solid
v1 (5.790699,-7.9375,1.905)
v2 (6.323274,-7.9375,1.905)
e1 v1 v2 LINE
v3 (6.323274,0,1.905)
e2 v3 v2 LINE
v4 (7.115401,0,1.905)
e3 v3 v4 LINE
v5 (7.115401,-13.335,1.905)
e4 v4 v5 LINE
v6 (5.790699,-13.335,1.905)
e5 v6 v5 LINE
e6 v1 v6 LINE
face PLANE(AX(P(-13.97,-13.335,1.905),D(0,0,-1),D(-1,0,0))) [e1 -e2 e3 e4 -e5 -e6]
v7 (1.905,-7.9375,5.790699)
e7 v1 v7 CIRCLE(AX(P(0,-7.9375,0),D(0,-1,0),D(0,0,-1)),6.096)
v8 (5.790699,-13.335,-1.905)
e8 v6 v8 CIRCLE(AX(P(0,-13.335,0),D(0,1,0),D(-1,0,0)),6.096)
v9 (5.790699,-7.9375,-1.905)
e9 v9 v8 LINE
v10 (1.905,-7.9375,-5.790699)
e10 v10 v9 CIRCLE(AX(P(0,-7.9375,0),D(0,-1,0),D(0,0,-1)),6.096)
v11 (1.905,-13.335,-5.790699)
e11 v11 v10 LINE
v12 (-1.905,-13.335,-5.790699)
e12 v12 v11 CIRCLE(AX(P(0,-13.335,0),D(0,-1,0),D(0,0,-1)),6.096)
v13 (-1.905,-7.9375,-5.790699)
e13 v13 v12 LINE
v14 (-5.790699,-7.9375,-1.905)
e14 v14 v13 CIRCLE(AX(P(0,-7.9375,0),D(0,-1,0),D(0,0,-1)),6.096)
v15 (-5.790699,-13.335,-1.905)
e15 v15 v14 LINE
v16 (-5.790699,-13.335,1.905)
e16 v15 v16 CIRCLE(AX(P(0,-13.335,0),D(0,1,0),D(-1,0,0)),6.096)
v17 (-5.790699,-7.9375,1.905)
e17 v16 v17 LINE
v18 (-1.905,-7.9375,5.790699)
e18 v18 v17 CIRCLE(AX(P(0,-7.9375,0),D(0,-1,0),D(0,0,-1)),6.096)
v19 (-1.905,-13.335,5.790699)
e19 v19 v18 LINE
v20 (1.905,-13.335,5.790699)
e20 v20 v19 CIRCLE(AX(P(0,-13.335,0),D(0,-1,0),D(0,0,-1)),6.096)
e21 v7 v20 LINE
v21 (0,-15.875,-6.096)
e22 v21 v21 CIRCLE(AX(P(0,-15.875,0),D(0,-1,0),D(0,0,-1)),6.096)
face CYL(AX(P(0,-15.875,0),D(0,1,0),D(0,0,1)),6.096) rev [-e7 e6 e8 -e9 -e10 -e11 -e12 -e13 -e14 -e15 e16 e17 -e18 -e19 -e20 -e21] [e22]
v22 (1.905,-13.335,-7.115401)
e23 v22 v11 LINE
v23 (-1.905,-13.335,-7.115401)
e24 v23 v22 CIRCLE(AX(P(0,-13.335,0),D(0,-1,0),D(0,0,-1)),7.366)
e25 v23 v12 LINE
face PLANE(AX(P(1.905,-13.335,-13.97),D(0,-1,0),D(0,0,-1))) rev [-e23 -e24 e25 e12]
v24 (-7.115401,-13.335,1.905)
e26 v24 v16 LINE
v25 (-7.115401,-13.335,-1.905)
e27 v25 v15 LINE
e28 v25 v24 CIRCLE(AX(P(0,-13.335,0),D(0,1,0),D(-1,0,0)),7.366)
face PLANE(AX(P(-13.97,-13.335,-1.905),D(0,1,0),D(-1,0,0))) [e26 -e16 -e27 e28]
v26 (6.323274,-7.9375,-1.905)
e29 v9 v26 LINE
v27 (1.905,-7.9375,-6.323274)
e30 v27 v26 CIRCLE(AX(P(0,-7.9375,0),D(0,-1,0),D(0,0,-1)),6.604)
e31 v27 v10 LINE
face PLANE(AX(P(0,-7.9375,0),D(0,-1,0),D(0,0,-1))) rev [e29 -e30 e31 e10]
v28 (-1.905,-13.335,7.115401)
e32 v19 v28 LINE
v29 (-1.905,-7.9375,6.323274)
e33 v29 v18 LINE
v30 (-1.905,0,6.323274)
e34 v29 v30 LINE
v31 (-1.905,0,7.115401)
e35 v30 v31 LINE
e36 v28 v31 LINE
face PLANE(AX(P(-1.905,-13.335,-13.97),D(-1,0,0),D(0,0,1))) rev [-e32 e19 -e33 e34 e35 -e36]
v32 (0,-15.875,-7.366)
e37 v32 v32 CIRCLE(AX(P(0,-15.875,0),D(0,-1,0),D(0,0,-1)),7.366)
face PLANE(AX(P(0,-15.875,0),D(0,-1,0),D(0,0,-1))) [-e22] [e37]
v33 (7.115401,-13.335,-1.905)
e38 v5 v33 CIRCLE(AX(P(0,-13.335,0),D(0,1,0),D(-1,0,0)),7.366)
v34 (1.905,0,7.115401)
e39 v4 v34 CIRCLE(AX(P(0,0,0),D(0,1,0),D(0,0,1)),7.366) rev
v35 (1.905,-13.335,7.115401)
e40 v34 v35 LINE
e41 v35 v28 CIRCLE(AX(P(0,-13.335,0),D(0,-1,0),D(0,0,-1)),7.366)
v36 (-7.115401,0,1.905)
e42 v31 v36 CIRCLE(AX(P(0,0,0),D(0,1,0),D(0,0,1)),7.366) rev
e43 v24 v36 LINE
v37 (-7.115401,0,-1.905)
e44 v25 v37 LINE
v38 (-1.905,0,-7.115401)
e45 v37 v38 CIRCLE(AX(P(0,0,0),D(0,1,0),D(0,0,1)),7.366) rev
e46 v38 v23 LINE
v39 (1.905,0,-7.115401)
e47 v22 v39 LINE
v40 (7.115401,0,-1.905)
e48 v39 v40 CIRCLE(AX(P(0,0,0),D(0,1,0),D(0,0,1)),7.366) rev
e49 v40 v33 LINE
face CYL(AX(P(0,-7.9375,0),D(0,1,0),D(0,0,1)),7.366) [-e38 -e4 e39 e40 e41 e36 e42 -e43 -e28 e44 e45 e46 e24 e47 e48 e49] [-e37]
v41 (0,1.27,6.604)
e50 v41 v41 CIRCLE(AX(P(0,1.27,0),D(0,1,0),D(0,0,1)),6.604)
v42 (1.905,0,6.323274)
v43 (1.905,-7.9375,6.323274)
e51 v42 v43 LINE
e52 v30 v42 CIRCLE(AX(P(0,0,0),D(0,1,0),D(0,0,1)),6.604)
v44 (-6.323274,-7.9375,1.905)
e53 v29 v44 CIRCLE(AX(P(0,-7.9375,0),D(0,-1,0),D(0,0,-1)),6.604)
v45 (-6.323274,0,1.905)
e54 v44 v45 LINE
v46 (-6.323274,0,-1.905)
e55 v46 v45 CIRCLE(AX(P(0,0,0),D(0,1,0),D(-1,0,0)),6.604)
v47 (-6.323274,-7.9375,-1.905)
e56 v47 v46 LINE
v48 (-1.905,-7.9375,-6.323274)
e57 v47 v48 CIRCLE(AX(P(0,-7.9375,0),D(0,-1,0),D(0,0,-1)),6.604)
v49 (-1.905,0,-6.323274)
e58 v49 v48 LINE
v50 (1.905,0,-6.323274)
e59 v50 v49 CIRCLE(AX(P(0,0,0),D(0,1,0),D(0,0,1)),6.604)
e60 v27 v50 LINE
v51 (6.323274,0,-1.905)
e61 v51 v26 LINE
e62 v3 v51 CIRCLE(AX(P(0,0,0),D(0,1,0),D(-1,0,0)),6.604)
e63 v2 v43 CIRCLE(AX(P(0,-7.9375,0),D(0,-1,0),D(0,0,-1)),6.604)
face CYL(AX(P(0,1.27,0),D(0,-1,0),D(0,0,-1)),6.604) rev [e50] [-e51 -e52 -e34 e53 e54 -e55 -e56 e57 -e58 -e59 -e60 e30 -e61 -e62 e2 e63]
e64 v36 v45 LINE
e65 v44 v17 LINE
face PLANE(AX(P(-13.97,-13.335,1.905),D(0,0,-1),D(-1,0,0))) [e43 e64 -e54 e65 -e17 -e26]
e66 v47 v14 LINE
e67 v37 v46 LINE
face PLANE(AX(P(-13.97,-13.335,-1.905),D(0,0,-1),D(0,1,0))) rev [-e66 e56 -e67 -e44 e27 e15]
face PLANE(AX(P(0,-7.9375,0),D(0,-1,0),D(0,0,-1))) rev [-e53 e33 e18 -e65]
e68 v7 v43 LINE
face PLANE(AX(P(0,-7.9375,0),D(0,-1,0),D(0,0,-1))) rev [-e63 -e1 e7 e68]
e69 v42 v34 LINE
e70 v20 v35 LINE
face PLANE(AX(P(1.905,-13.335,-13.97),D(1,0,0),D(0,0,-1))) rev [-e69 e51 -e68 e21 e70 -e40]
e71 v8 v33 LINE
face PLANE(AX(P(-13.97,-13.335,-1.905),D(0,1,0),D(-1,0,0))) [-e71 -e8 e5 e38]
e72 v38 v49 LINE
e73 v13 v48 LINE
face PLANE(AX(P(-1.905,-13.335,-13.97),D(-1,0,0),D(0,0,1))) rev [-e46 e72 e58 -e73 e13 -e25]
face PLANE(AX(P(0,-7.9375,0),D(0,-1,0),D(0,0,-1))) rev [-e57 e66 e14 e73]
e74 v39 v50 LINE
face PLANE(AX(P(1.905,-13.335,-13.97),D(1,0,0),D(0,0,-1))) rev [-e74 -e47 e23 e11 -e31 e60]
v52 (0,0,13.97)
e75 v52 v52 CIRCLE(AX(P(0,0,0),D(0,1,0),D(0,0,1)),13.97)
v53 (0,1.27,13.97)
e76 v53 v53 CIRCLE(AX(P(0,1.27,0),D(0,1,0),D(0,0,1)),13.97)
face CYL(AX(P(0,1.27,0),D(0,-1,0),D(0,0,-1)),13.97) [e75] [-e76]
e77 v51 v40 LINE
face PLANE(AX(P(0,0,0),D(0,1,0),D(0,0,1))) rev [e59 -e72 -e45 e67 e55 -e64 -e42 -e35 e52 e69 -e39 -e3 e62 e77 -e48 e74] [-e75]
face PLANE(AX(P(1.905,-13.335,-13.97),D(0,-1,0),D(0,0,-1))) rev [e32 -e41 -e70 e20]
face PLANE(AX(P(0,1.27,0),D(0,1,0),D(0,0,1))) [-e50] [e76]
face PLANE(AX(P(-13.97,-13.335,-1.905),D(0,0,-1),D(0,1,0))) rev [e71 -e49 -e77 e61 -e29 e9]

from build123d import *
from build123d.topology import SkipClean

# Parameters (mm, degrees)
SKETCH1_R          = 13.97
SKETCH1_R_2        = 6.604
STABILIZER_DEPTH   = 1.27
LARGE_START        = 7.9375
SKETCH2_R          = 7.366
SKETCH2_R_2        = 6.604
LARGE_END_DEPTH    = 7.9375
SMALL_START        = 7.9375
SKETCH3_R          = 7.366
SKETCH3_R_2        = 6.096
SMALL_END_DEPTH    = 7.9375
SKETCH5_W          = 3.81
SKETCH5_H          = 13.335
CUT_EXTRUDE1_DEPTH = 31.730063798
SKETCH7_W          = 3.81
SKETCH7_H          = 13.335
CUT_EXTRUDE2_DEPTH = 31.730063798


with BuildPart() as part:
    # Sketch1 → Stabilizer (new body)
    with BuildSketch(Plane(origin=(0, 0, 0), x_dir=(1, 0, 0), z_dir=(0, 1, 0))):
        Circle(SKETCH1_R)
        Circle(SKETCH1_R_2, mode=Mode.SUBTRACT)
    extrude(amount=STABILIZER_DEPTH)

    # Sketch2 → Large End (add)
    with SkipClean():  # the faces are left unmerged after this step: merging them gives an invalid solid
        with BuildSketch(Plane(origin=(0, 0, 0), x_dir=(-1, 0, 0), z_dir=(0, -1, 0)).offset(LARGE_START)):
            Circle(SKETCH2_R)
            Circle(SKETCH2_R_2, mode=Mode.SUBTRACT)
        extrude(amount=-LARGE_END_DEPTH)

    # Sketch3 → Small End (add)
    with SkipClean():  # the faces are left unmerged after this step: merging them gives an invalid solid
        with BuildSketch(Plane(origin=(0, -7.9375, 0), x_dir=(-1, 0, 0), z_dir=(0, -1, 0)).offset(SMALL_START)):
            Circle(SKETCH3_R)
            Circle(SKETCH3_R_2, mode=Mode.SUBTRACT)
        extrude(amount=-SMALL_END_DEPTH)

    # Sketch5 → Cut-Extrude1 (cut, through all)
    with SkipClean():  # the faces are left unmerged after this step: merging them gives an invalid solid
        with BuildSketch(Plane(origin=(0, -15.875, 7.366), x_dir=(1, 0, 0), z_dir=(0, 0, 1))):
            with Locations((0, 9.2075)):
                Rectangle(SKETCH5_W, SKETCH5_H)
        extrude(amount=-CUT_EXTRUDE1_DEPTH, mode=Mode.SUBTRACT)

    # Sketch7 → Cut-Extrude2 (cut, through all)
    with SkipClean():  # the faces are left unmerged after this step: merging them gives an invalid solid
        with BuildSketch(Plane(origin=(7.366, -15.875, 0), x_dir=(0, 0, -1), z_dir=(1, 0, 0))):
            with Locations((0, 9.2075)):
                Rectangle(SKETCH7_W, SKETCH7_H)
        extrude(amount=-CUT_EXTRUDE2_DEPTH, mode=Mode.SUBTRACT)
    add(part.part.scale(1), mode=Mode.REPLACE)  # the faces are merged on a copy


solid = part.part
